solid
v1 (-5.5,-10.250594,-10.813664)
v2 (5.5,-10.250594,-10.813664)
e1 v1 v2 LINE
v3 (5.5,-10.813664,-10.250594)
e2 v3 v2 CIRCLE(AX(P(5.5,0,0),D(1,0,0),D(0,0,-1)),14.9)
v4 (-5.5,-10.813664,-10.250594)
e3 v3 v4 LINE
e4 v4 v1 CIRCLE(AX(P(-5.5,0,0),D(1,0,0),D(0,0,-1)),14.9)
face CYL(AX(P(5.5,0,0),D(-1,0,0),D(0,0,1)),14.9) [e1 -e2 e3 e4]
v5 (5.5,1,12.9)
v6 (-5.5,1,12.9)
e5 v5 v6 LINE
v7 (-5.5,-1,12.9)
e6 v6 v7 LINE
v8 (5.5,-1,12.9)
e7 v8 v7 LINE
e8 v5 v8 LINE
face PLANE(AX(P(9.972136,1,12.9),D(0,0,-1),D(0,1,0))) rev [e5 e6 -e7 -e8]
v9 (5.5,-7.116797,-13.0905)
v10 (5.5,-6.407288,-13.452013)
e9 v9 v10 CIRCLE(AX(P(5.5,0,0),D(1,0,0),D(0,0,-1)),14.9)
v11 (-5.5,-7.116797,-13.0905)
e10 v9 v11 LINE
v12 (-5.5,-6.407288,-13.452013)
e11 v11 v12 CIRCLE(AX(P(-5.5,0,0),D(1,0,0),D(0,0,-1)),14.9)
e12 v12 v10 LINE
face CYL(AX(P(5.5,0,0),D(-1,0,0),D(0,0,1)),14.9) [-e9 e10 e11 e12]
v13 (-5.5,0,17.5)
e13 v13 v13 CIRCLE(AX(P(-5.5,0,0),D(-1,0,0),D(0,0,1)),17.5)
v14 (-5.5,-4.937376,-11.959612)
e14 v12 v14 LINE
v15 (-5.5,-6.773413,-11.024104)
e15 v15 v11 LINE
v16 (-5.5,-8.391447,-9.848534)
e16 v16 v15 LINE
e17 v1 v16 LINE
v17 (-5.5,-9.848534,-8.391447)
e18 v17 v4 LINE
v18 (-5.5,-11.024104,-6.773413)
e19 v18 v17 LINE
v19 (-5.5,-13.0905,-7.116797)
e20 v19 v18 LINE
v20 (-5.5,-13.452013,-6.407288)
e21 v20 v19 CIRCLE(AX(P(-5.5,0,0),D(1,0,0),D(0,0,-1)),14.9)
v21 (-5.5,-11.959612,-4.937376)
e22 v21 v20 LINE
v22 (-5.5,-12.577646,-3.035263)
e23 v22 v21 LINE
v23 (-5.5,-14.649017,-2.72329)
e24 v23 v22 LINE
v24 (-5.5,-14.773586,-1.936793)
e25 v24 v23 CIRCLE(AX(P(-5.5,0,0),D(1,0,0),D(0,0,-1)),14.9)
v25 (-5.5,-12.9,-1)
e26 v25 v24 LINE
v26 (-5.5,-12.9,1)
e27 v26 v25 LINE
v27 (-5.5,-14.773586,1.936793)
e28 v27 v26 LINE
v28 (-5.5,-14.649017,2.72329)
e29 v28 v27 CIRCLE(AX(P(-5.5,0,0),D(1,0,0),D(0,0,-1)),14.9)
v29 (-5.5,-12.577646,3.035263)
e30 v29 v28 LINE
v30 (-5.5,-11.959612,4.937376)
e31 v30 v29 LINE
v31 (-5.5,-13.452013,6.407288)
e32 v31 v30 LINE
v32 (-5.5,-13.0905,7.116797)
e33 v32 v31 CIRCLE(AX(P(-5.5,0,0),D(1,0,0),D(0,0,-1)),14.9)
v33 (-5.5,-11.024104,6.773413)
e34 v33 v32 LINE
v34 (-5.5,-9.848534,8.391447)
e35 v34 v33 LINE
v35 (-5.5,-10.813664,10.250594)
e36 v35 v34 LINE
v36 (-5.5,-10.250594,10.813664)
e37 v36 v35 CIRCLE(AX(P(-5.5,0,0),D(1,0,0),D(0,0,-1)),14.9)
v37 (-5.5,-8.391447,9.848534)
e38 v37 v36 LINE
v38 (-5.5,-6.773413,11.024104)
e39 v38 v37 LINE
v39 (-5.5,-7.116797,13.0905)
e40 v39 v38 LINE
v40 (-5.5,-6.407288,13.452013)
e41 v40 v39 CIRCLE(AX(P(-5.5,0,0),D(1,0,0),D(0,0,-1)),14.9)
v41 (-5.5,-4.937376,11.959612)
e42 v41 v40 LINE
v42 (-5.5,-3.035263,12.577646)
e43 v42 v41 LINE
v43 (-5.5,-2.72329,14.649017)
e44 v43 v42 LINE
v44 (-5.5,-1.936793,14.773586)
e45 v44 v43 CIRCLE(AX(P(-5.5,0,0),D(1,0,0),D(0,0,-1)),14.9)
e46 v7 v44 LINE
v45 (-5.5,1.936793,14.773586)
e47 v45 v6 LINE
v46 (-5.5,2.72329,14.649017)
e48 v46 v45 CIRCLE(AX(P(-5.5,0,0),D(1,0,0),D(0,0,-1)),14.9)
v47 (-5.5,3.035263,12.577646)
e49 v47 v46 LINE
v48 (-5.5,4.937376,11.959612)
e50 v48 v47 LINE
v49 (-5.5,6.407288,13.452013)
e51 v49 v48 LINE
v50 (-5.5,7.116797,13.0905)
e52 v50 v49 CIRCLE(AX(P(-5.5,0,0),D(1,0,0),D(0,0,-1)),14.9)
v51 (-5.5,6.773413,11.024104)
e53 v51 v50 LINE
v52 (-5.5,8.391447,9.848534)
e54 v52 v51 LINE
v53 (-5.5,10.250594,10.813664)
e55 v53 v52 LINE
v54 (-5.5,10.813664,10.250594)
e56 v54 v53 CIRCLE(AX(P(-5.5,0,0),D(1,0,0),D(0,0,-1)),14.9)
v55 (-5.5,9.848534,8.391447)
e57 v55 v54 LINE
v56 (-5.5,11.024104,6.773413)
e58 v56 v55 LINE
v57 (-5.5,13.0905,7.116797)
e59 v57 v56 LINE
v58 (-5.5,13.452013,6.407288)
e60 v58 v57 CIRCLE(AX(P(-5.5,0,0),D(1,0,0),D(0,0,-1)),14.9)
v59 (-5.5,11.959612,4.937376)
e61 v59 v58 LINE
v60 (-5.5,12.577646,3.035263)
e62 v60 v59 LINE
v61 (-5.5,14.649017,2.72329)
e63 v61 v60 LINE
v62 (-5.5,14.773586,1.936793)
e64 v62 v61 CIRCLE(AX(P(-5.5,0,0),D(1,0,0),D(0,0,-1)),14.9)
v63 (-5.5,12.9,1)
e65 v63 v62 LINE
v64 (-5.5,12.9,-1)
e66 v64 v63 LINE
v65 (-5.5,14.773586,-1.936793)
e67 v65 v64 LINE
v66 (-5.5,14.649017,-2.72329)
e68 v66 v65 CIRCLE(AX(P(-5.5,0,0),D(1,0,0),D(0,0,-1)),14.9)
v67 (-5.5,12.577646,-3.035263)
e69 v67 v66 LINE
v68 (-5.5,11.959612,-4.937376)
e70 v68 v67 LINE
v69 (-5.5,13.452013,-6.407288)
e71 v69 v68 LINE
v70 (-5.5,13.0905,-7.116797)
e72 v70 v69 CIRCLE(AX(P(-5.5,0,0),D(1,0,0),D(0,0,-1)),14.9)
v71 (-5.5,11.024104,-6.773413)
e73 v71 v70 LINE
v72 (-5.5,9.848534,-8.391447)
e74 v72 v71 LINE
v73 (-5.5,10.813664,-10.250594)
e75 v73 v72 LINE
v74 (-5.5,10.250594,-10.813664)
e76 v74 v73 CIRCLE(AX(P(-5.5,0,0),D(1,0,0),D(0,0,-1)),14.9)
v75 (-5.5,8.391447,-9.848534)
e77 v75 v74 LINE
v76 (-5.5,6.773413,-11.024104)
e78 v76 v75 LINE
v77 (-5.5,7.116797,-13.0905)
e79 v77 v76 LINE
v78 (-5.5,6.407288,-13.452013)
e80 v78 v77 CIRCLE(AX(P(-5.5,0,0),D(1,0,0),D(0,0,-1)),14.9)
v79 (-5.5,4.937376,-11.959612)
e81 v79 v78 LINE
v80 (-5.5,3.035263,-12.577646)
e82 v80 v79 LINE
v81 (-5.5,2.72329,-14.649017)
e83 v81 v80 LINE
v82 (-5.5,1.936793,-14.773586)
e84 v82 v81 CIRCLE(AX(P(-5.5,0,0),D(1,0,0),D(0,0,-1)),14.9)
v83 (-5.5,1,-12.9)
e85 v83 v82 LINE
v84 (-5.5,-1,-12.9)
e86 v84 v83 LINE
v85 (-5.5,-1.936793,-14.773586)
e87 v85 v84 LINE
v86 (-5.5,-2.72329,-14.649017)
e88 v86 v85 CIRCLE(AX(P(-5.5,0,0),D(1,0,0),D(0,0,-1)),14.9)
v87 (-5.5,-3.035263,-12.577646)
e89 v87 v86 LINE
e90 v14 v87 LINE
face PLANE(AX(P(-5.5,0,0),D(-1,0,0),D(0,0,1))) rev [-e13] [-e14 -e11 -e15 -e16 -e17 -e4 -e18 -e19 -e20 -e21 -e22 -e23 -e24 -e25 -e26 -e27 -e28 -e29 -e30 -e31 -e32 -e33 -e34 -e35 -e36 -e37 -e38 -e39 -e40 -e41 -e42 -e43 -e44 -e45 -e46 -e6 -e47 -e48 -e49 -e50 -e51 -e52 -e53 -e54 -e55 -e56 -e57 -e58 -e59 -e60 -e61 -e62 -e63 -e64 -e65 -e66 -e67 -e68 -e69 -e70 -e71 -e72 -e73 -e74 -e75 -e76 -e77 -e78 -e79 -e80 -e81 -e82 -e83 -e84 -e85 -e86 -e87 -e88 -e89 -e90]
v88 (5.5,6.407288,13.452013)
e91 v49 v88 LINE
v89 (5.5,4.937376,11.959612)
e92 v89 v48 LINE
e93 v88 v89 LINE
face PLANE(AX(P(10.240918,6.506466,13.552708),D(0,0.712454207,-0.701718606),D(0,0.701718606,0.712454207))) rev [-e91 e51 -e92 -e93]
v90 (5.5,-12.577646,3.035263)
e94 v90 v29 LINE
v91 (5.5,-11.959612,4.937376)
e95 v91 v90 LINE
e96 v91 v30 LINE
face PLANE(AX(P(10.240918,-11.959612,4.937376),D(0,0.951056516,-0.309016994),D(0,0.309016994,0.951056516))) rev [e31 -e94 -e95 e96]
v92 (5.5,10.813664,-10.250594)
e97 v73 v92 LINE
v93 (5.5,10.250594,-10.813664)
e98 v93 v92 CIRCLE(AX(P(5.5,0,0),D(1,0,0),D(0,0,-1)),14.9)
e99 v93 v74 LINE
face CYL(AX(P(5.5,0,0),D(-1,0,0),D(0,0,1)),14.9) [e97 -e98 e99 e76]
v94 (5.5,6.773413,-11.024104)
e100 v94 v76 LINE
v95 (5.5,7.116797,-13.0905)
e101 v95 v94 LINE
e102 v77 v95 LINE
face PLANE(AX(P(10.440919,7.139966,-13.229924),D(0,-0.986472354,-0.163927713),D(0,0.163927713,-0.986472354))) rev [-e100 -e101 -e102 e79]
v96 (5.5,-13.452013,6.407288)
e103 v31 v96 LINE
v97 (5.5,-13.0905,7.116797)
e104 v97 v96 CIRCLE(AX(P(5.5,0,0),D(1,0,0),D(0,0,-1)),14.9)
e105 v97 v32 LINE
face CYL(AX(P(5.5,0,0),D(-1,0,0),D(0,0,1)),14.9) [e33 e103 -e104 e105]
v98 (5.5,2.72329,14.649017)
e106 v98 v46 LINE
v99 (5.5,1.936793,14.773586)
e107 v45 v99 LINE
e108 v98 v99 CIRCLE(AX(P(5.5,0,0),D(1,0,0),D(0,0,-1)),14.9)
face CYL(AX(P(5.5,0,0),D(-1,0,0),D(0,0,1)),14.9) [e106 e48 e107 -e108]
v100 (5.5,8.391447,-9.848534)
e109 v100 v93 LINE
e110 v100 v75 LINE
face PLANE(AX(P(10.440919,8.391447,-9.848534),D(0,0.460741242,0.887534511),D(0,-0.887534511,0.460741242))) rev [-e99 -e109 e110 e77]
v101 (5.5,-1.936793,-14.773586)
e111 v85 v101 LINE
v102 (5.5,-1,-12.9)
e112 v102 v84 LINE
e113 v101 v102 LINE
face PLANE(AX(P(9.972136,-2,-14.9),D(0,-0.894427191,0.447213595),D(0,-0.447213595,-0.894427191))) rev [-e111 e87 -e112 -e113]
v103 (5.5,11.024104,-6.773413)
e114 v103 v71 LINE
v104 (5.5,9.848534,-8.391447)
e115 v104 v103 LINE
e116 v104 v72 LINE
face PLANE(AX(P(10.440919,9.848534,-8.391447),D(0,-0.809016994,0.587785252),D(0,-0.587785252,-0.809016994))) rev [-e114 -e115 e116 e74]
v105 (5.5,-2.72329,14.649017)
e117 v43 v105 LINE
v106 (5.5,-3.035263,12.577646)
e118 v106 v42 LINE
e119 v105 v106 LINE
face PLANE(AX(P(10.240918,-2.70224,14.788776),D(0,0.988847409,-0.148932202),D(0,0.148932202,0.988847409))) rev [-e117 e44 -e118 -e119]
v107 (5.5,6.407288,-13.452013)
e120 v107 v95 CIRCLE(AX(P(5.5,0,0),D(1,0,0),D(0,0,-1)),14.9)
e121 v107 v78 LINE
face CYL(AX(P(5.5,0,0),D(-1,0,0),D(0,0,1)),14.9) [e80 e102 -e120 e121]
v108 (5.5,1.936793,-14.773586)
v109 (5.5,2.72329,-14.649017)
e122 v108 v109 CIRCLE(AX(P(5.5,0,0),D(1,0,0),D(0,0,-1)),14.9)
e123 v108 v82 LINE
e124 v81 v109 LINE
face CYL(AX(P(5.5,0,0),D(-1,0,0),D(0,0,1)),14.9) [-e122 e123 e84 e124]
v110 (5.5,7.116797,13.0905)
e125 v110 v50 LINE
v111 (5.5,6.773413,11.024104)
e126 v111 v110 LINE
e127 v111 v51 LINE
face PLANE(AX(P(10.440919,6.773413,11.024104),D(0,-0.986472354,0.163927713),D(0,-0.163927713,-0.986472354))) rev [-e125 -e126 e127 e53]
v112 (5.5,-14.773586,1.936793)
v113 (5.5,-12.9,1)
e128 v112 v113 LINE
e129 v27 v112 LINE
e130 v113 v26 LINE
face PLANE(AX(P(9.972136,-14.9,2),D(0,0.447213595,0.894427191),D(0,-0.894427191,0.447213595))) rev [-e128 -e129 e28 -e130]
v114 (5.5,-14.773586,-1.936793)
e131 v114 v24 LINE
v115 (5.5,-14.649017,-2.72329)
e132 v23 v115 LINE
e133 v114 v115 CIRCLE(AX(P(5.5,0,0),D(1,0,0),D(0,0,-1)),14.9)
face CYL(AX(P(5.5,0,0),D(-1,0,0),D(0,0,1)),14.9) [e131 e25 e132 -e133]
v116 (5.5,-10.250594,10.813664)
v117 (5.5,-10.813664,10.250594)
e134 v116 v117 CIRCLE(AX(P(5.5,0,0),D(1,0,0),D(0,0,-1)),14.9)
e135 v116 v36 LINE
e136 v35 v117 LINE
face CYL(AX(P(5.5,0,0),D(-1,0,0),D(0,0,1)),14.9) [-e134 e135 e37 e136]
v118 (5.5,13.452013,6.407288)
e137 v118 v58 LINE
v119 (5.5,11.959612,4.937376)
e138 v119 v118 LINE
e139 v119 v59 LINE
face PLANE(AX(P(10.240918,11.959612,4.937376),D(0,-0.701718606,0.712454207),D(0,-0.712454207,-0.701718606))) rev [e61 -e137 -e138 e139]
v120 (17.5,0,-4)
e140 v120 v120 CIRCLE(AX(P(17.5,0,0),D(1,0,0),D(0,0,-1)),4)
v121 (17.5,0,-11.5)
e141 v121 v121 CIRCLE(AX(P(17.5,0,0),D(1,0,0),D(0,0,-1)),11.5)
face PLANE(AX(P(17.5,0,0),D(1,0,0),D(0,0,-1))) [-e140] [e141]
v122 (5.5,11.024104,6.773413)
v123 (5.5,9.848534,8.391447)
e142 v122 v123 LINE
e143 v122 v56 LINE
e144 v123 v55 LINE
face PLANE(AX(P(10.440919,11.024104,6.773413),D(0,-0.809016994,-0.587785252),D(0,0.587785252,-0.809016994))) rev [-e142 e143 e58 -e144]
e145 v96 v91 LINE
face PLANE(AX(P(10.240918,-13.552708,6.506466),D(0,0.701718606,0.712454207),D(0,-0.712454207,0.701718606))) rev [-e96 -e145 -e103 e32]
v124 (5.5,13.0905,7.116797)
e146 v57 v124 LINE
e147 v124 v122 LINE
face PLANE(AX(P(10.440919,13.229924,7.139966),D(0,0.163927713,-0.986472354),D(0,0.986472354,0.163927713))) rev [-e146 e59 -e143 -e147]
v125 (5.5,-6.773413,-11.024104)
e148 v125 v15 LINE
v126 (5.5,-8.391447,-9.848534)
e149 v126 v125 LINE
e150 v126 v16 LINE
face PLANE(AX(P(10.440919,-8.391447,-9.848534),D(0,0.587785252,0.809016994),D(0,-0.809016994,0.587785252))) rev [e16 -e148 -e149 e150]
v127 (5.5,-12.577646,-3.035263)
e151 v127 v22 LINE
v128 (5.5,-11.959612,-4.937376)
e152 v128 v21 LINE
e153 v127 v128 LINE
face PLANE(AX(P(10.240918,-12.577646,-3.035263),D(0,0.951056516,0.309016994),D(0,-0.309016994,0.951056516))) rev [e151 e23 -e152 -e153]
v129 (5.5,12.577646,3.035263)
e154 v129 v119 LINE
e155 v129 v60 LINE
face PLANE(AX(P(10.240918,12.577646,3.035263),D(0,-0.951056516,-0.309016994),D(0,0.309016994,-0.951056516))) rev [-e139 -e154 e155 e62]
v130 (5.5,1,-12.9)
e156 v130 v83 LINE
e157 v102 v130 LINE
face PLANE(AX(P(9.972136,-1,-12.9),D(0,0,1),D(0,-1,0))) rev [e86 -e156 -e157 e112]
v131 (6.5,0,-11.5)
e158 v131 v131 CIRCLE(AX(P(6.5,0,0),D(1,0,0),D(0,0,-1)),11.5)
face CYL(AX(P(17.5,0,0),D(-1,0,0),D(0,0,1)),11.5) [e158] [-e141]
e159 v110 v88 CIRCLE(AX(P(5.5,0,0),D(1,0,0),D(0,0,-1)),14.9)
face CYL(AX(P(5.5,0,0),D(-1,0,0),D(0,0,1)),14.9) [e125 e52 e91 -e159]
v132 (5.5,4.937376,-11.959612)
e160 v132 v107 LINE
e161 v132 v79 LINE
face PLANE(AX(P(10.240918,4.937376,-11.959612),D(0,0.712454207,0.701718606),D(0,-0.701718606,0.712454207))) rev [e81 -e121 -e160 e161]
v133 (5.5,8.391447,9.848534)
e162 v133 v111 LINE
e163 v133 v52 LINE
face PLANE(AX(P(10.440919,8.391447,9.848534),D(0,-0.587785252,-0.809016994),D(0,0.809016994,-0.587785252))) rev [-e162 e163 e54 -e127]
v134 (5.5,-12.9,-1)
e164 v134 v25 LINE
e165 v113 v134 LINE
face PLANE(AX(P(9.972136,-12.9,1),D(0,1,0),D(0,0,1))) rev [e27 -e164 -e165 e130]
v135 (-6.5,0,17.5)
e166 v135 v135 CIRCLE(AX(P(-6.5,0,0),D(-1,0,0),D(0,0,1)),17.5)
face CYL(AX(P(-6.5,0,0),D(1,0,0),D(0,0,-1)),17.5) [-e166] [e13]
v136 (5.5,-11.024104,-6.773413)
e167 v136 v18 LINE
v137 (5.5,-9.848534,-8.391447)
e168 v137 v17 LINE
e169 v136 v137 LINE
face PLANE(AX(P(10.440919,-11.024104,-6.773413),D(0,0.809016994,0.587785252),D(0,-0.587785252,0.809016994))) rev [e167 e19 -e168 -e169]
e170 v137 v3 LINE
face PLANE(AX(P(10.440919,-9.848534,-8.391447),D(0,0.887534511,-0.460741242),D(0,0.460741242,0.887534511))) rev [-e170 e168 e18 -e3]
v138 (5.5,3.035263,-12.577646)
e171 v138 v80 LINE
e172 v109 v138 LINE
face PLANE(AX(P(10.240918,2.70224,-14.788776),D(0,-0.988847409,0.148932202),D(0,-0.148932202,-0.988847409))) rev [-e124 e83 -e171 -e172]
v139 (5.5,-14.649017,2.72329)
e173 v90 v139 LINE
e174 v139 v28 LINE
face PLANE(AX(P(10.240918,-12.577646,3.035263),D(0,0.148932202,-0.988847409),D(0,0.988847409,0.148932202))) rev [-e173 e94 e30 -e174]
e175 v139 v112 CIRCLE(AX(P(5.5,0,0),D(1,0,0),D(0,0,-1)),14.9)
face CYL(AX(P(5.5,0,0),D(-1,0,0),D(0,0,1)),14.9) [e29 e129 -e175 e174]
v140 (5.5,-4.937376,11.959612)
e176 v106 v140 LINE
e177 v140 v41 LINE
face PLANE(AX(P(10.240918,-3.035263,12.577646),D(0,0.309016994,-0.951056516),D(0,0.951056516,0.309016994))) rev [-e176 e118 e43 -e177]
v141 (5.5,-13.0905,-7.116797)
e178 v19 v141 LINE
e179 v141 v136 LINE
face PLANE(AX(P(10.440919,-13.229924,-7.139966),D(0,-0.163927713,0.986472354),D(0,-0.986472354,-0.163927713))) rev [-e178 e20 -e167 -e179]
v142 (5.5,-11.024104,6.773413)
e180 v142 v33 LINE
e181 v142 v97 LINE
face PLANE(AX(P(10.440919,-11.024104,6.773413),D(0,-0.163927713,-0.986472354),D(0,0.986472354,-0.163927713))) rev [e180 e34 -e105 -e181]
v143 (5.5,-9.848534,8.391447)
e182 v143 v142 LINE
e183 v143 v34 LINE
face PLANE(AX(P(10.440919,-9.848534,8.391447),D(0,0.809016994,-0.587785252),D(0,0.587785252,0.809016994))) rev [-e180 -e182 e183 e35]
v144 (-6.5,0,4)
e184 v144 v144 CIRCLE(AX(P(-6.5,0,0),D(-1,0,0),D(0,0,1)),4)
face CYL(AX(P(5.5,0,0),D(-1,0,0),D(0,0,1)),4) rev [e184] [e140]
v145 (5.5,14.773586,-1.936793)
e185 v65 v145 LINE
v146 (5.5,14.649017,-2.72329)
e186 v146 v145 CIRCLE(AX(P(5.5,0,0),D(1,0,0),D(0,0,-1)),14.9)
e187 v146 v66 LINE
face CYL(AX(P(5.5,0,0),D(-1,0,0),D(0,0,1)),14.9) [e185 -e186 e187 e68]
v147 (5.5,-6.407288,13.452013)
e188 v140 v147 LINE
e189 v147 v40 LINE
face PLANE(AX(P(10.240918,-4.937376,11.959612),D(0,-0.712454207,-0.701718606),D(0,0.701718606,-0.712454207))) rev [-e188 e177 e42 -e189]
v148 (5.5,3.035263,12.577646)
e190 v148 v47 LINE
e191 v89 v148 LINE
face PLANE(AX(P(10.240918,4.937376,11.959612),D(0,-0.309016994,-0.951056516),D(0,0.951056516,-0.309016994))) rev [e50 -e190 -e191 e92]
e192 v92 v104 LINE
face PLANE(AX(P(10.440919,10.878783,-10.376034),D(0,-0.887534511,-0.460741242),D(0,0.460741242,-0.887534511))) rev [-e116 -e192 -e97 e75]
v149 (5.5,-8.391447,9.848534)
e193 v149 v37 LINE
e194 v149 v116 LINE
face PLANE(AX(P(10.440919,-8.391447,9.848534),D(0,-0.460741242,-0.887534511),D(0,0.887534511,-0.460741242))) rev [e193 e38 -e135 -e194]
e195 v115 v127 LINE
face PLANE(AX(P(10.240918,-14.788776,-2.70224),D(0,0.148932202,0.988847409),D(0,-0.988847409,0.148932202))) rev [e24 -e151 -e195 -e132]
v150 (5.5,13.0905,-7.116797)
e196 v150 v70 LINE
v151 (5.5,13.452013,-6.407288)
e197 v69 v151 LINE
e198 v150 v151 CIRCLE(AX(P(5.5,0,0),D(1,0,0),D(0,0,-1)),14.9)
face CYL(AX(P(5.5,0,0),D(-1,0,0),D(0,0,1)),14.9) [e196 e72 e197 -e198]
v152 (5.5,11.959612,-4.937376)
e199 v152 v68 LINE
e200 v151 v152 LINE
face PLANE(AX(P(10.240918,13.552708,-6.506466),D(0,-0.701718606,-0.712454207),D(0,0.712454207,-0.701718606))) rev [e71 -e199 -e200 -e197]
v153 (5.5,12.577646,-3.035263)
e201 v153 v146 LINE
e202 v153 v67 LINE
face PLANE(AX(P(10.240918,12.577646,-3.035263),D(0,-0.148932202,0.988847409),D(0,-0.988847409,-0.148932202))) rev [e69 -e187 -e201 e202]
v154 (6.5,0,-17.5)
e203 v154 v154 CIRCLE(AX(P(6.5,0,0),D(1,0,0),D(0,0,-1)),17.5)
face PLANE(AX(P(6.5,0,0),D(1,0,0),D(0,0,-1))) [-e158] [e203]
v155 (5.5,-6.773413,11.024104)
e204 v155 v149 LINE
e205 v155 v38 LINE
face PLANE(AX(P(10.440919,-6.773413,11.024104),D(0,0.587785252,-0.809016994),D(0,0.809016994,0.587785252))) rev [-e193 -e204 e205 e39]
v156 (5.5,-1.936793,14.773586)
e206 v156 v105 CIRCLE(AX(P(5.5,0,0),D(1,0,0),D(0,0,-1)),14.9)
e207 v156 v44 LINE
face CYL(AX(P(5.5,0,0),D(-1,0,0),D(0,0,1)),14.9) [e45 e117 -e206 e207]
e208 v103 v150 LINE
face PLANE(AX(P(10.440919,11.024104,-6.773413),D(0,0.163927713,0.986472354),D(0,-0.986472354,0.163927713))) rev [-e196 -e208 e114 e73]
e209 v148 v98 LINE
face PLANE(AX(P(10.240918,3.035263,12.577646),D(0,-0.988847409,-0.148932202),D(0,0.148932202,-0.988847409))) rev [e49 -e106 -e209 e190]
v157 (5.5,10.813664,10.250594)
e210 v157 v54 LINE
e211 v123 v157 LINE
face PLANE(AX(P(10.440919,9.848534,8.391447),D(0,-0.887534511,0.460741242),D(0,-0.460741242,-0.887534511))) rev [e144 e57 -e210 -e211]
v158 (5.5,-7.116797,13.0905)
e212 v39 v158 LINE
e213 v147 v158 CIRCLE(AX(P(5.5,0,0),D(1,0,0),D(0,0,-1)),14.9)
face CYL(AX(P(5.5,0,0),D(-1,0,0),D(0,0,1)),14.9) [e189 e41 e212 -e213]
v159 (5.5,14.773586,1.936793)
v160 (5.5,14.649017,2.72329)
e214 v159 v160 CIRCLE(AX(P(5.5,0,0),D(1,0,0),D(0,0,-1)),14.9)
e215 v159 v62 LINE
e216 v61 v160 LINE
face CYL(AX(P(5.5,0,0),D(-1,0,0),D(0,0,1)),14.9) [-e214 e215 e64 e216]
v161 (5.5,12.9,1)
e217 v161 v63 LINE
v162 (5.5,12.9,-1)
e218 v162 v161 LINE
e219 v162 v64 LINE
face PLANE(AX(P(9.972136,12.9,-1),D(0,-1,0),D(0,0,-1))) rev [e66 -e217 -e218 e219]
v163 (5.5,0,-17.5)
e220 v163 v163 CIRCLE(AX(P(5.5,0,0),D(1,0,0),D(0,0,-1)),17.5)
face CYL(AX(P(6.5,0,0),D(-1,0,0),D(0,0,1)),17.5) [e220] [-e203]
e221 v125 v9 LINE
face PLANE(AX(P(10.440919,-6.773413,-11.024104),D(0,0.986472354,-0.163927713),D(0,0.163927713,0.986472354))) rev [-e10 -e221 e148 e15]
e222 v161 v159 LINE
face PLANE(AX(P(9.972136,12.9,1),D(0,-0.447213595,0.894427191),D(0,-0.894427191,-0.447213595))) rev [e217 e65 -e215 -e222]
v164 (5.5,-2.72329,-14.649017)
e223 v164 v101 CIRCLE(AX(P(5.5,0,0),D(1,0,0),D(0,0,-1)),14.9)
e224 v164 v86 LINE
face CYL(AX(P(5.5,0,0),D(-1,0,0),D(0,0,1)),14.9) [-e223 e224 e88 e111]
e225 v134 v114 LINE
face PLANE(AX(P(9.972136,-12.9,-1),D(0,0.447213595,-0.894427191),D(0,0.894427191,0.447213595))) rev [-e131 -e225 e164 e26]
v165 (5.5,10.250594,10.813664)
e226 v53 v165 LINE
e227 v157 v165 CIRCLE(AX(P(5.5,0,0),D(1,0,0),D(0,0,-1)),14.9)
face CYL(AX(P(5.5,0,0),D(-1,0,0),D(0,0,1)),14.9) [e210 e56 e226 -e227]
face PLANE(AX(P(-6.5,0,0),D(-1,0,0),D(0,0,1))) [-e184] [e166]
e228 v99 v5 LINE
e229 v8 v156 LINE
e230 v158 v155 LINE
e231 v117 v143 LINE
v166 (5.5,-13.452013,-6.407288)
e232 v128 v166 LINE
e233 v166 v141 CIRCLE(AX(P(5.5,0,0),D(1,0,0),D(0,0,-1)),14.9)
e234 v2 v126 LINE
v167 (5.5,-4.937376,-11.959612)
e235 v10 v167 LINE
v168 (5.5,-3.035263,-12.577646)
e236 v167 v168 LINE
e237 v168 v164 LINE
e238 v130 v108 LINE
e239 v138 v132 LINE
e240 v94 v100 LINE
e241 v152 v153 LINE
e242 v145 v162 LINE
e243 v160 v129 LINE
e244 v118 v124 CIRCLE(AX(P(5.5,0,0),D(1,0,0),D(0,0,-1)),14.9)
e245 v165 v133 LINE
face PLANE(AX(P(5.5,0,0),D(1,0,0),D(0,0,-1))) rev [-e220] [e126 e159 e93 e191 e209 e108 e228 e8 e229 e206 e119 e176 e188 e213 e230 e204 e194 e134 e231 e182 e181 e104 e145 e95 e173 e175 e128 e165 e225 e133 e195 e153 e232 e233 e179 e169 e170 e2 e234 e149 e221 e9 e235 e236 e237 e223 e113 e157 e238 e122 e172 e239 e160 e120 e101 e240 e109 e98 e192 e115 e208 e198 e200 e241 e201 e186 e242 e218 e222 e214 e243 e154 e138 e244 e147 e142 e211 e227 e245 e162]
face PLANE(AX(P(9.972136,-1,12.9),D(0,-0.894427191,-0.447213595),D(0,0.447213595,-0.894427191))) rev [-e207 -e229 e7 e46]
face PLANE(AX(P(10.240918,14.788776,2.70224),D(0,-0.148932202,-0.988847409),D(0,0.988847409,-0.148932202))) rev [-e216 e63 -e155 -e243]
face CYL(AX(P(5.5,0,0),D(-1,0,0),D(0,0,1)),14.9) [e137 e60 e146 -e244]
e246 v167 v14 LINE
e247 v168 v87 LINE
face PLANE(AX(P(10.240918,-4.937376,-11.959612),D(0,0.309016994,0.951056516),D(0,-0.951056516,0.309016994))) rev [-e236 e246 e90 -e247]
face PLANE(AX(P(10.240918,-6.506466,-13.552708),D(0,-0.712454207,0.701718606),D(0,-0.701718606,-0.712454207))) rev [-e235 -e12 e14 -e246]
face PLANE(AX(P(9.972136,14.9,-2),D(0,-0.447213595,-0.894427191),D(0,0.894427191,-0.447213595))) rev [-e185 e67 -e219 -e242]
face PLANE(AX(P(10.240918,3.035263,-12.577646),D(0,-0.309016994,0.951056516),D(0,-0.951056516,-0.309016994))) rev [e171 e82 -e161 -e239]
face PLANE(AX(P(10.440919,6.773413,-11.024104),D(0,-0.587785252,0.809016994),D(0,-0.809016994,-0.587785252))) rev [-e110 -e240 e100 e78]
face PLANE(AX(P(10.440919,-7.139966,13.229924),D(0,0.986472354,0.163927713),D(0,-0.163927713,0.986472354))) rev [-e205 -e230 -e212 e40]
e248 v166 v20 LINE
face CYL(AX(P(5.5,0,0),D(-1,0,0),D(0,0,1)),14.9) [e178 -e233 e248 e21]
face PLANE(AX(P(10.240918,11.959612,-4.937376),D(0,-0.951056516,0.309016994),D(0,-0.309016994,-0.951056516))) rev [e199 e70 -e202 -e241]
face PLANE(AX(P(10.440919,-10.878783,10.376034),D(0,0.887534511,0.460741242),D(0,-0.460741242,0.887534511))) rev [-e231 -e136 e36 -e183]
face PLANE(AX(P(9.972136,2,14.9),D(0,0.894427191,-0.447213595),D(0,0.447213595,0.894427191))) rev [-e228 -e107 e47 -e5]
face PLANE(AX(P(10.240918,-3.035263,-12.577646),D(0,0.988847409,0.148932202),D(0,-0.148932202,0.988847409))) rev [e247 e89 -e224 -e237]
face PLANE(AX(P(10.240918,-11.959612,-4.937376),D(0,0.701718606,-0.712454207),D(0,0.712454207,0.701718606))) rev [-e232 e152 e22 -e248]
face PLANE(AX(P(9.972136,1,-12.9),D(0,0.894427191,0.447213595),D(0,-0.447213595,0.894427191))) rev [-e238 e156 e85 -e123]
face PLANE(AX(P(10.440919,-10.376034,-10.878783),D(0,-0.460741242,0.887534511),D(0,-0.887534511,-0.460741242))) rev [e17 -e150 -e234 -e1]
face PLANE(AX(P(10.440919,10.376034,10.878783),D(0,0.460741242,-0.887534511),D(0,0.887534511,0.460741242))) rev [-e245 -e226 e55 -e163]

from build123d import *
from build123d.topology import SkipClean

# Parameters (mm, degrees)
SKETCH1_R           = 14.9
SKETCH1_R_2         = 4
BOSS_EXTRUDE1_DEPTH = 5.5
SKETCH2_R           = 11.5
SKETCH2_R_2         = 4
BOSS_EXTRUDE2_DEPTH = 12
CUT_EXTRUDE2_DEPTH  = 11
CIRPATTERN2_COUNT   = 20
BOSS_EXTRUDE3_START = 1
SKETCH7_R           = 17.5
SKETCH7_R_2         = 4
BOSS_EXTRUDE3_DEPTH = 1
SKETCH8_R           = 17.5
SKETCH8_R_2         = 4
BOSS_EXTRUDE4_DEPTH = 1


with BuildPart() as part:
    # Sketch1 → Boss-Extrude1 (new, symmetric)
    with BuildSketch(Plane(origin=(0, 0, 0), x_dir=(0, 0, -1), z_dir=(1, 0, 0))):
        Circle(SKETCH1_R)
        Circle(SKETCH1_R_2, mode=Mode.SUBTRACT)
    extrude(amount=BOSS_EXTRUDE1_DEPTH, both=True)

    # Sketch2 → Boss-Extrude2 (add)
    with BuildSketch(Plane(origin=(5.5, 0, 0), x_dir=(0, 0, -1), z_dir=(1, 0, 0))):
        Circle(SKETCH2_R)
        Circle(SKETCH2_R_2, mode=Mode.SUBTRACT)
    extrude(amount=BOSS_EXTRUDE2_DEPTH)

    # Sketch6 → Cut-Extrude2 (cut)
    with BuildSketch(Plane.ZY.offset(5.5)):
        Polygon((-1, 12.9), (1, 12.9), (2, 14.9), (-2, 14.9), align=None)
    cut_extrude2 = extrude(amount=-CUT_EXTRUDE2_DEPTH, mode=Mode.SUBTRACT)

    # CirPattern2: Cut-Extrude2 ×20 about axis
    cirpattern2_axis = Axis((0, 0, 0), (1, 0, 0))
    for i in range(1, CIRPATTERN2_COUNT):
        add(cut_extrude2.rotate(cirpattern2_axis, i * 360 / CIRPATTERN2_COUNT), mode=Mode.SUBTRACT)

    # Sketch7 → Boss-Extrude3 (add)
    with SkipClean():  # the faces are left unmerged after this step: merging them gives an invalid solid
        with BuildSketch(Plane.ZY.offset(5.5).offset(BOSS_EXTRUDE3_START)):
            Circle(SKETCH7_R)
            Circle(SKETCH7_R_2, mode=Mode.SUBTRACT)
        extrude(amount=-BOSS_EXTRUDE3_DEPTH)

    # Sketch8 → Boss-Extrude4 (add)
    with SkipClean():  # the faces are left unmerged after this step: merging them gives an invalid solid
        with BuildSketch(Plane(origin=(5.5, 0, 0), x_dir=(0, 0, -1), z_dir=(1, 0, 0))):
            with Locations(Location((0, 0, 0), (0, 0, 180))):
                Circle(SKETCH8_R)
            with Locations(Location((0, 0, 0), (0, 0, 180))):
                Circle(SKETCH8_R_2, mode=Mode.SUBTRACT)
        extrude(amount=BOSS_EXTRUDE4_DEPTH)
    add(part.part.scale(1), mode=Mode.REPLACE)  # the faces are merged on a copy


solid = part.part
